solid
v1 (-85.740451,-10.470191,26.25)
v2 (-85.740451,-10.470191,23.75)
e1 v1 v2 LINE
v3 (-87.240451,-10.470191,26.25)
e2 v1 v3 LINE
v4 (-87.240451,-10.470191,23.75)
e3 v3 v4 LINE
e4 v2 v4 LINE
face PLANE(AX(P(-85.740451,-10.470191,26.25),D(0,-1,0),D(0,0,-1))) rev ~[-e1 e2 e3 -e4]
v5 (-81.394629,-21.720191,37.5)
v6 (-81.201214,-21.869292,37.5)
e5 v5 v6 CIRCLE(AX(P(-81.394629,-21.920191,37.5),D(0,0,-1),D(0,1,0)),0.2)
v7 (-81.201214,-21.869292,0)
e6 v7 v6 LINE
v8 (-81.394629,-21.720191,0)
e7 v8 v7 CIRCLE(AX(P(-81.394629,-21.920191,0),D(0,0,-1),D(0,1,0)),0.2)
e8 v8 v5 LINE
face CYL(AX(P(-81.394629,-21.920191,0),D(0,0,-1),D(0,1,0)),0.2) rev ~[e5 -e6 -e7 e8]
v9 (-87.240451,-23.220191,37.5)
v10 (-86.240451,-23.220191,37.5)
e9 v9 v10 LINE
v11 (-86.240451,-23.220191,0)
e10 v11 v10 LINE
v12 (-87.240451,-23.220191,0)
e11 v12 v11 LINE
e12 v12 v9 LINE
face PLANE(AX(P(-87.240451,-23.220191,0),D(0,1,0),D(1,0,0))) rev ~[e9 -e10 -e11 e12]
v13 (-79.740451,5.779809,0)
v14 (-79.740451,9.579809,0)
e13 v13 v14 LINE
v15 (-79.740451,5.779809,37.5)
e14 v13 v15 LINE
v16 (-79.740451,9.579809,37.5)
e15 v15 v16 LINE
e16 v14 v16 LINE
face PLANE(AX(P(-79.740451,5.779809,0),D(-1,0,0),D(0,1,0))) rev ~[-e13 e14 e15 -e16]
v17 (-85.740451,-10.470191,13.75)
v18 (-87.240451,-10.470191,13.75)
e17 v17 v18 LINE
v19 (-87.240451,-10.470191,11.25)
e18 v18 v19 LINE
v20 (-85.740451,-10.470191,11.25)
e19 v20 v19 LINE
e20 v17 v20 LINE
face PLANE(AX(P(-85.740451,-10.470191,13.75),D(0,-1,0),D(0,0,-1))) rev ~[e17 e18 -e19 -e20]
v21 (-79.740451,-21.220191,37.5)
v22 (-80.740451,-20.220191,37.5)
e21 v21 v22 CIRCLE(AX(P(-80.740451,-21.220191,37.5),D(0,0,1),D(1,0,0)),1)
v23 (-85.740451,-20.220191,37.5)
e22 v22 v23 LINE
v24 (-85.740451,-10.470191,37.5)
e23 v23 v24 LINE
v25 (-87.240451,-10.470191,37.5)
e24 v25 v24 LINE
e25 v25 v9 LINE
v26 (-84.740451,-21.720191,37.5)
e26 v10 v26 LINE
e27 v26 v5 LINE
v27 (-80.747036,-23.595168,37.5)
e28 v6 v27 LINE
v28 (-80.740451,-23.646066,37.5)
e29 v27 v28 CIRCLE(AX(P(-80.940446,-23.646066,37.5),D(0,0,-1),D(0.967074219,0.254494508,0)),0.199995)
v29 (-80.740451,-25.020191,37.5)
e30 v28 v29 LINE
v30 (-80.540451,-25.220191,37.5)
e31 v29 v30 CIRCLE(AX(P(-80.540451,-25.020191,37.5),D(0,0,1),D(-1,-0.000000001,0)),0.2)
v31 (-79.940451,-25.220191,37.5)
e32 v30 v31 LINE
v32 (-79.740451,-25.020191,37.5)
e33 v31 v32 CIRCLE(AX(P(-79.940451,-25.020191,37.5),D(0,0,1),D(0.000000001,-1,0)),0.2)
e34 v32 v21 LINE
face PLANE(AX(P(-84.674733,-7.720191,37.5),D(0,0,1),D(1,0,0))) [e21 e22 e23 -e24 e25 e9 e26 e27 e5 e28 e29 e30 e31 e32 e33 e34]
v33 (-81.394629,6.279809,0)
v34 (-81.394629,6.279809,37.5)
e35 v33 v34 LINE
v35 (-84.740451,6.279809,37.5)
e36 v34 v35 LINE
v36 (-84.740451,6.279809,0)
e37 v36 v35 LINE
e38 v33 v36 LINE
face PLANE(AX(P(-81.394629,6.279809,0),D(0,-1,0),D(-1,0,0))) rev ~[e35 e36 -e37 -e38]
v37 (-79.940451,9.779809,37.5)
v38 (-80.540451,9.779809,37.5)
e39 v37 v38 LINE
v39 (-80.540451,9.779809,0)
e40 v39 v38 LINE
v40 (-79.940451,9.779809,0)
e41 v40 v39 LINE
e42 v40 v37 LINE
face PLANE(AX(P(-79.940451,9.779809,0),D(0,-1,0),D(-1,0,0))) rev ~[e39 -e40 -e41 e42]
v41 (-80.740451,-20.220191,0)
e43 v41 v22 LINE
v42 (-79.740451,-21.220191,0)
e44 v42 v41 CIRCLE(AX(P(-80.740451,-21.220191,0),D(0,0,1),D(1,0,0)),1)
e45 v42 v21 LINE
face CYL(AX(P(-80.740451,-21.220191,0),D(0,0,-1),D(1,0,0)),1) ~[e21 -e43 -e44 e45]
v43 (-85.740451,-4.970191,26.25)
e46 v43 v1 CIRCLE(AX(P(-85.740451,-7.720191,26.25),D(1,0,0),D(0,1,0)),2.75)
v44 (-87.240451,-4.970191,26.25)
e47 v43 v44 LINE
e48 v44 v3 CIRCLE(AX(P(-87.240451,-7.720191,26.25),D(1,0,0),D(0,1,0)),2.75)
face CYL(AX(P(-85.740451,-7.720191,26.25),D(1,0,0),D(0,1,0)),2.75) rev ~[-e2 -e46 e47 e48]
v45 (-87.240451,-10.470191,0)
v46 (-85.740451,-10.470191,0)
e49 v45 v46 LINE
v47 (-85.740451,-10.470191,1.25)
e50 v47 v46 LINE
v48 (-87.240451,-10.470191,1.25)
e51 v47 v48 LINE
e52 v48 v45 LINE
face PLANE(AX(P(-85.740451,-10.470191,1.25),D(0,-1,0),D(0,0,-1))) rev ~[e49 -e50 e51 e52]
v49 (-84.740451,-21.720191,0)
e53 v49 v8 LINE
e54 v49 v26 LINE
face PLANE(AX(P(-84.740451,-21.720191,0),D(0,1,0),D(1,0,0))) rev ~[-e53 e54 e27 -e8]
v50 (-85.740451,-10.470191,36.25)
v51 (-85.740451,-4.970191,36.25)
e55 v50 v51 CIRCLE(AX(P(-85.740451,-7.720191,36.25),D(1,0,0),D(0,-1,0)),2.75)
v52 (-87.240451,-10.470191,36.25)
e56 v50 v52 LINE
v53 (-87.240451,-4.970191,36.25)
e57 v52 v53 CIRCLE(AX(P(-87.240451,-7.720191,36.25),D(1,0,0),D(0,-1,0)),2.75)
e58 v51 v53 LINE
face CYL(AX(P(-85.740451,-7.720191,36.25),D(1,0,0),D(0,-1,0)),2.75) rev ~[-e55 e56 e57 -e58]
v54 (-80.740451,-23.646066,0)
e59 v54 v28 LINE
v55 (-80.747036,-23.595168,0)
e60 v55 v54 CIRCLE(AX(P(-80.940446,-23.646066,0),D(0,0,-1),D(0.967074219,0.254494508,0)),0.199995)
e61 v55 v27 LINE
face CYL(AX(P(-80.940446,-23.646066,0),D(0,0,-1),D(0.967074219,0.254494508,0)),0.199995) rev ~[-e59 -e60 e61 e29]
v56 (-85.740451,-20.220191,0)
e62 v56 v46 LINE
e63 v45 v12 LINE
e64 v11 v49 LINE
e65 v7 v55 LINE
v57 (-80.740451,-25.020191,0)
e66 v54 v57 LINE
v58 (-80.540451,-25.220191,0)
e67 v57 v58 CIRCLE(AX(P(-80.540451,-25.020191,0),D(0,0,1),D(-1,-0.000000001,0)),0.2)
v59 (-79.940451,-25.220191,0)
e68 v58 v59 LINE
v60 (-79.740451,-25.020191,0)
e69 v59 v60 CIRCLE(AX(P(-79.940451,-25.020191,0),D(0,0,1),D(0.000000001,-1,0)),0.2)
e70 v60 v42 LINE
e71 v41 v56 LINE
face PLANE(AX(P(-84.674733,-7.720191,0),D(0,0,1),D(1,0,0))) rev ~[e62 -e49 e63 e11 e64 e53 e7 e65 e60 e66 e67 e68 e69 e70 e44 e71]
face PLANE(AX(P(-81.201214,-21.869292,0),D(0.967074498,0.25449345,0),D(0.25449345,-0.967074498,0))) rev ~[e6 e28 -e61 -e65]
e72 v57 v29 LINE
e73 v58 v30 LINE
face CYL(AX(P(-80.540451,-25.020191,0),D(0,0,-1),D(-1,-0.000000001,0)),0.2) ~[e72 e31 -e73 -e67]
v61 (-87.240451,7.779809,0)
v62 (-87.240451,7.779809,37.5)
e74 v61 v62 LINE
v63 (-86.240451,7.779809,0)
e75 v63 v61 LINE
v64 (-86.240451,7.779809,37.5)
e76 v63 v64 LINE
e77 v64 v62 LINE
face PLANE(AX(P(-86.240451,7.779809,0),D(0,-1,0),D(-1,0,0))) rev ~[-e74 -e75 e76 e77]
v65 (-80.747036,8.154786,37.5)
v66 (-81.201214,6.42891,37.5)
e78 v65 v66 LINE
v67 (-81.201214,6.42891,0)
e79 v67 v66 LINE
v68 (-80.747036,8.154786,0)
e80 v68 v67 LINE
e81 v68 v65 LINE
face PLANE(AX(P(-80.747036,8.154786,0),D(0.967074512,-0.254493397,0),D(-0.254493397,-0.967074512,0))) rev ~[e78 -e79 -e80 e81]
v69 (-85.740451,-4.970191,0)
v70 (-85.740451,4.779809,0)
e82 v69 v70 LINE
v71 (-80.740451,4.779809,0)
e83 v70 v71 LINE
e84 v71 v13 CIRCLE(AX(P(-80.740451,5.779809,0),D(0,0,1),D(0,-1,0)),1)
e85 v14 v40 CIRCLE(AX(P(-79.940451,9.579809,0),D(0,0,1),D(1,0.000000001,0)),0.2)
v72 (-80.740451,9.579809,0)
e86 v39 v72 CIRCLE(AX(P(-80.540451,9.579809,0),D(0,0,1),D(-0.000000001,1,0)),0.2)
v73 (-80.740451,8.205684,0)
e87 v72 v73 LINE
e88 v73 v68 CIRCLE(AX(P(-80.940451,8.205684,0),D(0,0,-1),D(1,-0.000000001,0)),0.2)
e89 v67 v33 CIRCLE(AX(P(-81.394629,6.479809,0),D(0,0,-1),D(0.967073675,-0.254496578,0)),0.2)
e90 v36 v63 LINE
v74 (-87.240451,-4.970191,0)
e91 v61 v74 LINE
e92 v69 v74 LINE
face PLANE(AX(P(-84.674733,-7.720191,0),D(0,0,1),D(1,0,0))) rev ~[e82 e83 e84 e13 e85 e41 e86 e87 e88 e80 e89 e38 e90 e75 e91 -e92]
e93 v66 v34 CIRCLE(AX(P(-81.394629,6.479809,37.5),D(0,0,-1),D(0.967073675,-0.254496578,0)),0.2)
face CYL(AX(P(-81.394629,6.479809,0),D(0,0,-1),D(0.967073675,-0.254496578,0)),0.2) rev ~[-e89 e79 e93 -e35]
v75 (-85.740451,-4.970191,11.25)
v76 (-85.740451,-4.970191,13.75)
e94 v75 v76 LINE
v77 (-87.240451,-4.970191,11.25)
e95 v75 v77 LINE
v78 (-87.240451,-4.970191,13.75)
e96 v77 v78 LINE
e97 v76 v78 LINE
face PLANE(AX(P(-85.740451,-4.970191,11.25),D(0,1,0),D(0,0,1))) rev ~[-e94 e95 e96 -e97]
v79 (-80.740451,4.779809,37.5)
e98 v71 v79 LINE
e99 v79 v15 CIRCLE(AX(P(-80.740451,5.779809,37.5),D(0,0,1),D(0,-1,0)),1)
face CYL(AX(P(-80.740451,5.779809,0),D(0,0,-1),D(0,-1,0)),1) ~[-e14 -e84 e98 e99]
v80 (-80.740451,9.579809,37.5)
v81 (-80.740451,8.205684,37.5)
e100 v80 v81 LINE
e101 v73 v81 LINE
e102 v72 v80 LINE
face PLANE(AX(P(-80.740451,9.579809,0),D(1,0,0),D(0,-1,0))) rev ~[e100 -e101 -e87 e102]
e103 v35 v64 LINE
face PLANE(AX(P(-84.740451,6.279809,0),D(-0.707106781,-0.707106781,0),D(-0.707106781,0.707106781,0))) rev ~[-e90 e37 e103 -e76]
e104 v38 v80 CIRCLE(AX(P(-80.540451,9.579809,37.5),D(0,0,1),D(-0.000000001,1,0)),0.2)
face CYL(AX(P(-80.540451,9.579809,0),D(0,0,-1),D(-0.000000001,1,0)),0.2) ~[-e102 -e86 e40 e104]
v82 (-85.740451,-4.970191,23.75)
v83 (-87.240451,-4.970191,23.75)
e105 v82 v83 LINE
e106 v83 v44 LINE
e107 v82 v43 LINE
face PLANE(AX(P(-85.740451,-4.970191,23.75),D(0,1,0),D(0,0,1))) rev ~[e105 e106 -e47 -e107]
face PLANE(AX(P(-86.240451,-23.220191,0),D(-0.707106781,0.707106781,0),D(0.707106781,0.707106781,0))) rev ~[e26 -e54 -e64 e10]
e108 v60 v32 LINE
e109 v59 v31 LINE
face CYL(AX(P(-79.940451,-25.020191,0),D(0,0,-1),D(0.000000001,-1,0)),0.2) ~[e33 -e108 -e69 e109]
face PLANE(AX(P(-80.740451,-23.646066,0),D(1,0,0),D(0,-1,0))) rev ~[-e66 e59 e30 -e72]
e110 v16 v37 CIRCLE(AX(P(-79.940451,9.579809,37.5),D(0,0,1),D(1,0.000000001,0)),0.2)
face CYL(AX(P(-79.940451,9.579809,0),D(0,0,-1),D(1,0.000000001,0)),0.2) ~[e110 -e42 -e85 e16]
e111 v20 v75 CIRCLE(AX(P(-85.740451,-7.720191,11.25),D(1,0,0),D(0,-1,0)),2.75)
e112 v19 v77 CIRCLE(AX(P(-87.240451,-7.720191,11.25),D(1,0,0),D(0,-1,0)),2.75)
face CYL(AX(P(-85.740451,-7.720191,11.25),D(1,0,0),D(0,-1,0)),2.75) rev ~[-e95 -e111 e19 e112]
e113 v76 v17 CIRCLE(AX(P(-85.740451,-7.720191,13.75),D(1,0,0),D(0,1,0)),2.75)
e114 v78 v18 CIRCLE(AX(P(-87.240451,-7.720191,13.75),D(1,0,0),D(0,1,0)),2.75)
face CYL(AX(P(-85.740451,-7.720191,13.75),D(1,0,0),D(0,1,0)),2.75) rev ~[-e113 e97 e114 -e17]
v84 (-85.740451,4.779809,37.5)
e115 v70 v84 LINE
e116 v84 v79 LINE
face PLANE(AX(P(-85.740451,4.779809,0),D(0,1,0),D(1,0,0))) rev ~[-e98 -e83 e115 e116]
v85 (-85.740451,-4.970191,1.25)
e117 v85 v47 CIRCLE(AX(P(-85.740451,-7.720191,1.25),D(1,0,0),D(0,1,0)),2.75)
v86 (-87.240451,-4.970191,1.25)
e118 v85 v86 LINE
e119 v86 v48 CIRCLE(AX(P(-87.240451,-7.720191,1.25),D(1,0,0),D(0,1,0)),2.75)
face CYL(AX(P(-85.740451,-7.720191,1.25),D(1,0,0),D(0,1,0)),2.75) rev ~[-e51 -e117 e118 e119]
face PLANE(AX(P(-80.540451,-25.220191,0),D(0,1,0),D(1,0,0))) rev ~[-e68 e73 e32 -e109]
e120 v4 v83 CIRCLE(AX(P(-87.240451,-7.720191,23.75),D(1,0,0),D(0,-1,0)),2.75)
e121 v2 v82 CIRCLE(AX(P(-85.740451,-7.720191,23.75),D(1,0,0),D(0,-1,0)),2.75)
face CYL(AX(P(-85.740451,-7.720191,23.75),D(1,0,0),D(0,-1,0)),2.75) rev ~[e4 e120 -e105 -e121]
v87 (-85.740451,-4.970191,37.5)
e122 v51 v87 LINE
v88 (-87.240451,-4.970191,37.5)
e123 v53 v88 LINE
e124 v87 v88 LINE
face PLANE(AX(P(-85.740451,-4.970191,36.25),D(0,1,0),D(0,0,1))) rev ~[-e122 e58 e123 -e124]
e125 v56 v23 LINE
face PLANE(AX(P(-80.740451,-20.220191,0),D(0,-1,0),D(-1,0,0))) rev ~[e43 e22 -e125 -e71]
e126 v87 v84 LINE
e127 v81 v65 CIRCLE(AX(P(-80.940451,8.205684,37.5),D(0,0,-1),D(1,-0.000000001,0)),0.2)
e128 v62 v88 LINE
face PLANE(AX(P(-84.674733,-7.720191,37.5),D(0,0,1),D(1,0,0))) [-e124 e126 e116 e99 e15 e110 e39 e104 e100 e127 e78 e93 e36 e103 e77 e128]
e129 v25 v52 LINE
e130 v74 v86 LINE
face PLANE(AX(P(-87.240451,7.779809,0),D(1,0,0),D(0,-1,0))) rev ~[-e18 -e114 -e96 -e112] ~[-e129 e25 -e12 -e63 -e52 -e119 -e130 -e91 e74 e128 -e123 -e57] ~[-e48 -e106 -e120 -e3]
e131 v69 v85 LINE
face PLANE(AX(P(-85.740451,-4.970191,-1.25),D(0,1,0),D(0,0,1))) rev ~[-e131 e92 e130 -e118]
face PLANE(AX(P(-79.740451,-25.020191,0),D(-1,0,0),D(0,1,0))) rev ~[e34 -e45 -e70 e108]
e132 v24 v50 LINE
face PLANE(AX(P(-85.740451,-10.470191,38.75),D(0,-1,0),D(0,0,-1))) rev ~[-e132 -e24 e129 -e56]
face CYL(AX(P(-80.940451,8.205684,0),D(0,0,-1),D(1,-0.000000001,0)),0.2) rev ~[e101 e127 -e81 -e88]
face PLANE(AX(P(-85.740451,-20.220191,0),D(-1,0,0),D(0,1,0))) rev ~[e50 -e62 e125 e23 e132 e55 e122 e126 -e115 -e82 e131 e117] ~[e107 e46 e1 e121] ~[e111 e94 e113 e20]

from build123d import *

# Parameters (mm, degrees)
F1_DEPTH = 37.5
F3_DEPTH = 25


# Not quite as in the source:
# - ends of sketch curves that miss each other by under 0.0002 mm in the source are joined


with BuildPart() as f1:
    # F0 (on Top) → F1 (new body)
    with BuildSketch(Plane.XY):
        with BuildLine():
            Line((-87.240451, 4.779809), (-87.240451, -5.411983))
            Line((-87.240451, -5.411983), (-87.240451, -7.720191))
            Line((-87.240451, -7.720191), (-87.240451, -17.023544))
            Line((-87.240451, -17.023544), (-87.240451, -20.220191))
            Line((-87.240451, -20.220191), (-87.240451, -23.220191))
            Line((-87.240451, -23.220191), (-86.240451, -23.220191))
            Line((-86.240451, -23.220191), (-84.740451, -21.720191))
            Line((-84.740451, -21.720191), (-81.394629, -21.720191))
            ThreePointArc((-81.394629, -21.720191), (-81.2725220613, -21.7617930975), (-81.2012141703, -21.8692920448))
            Line((-81.2012141703, -21.8692920448), (-80.747036, -23.595168))
            ThreePointArc((-80.747036, -23.595168), (-80.7421040626, -23.6204048929), (-80.740451, -23.646066))
            Line((-80.740451, -23.646066), (-80.740451, -25.020191))
            ThreePointArc((-80.740451, -25.020191), (-80.6818723562, -25.1616123562), (-80.540451, -25.220191))
            Line((-80.540451, -25.220191), (-79.940451, -25.220191))
            ThreePointArc((-79.940451, -25.220191), (-79.7990296438, -25.1616123562), (-79.740451, -25.020191))
            Line((-79.740451, -25.020191), (-79.740451, -21.220191))
            ThreePointArc((-79.740451, -21.220191), (-80.0333442188, -20.5130842188), (-80.740451, -20.220191))
            Line((-80.740451, -20.220191), (-85.740451, -20.220191))
            Line((-85.740451, -20.220191), (-85.740451, -7.720191))
            Line((-85.740451, -7.720191), (-85.740451, 4.779809))
            Line((-85.740451, 4.779809), (-80.740451, 4.779809))
            ThreePointArc((-80.740451, 4.779809), (-80.0333442188, 5.0727022188), (-79.740451, 5.779809))
            Line((-79.740451, 5.779809), (-79.740451, 9.579809))
            ThreePointArc((-79.740451, 9.579809), (-79.7990296438, 9.7212303562), (-79.940451, 9.779809))
            Line((-79.940451, 9.779809), (-80.540451, 9.779809))
            ThreePointArc((-80.540451, 9.779809), (-80.6818723562, 9.7212303562), (-80.740451, 9.579809))
            Line((-80.740451, 9.579809), (-80.740451, 8.205684))
            ThreePointArc((-80.740451, 8.205684), (-80.7421040626, 8.1800228929), (-80.7470359242, 8.15478598))
            Line((-80.7470359242, 8.15478598), (-81.201214, 6.42891))
            ThreePointArc((-81.201214, 6.42891), (-81.2725220613, 6.3214110975), (-81.394629, 6.279809))
            Line((-81.394629, 6.279809), (-84.740451, 6.279809))
            Line((-84.740451, 6.279809), (-86.240451, 7.779809))
            Line((-86.240451, 7.779809), (-87.240451, 7.779809))
            Line((-87.240451, 7.779809), (-87.240451, 4.779809))
        make_face()
    extrude(amount=F1_DEPTH)

    # F2 (on face) → F3 (cut)
    with BuildSketch(Plane.YZ.offset(-85.740451)):
        with BuildLine():
            ThreePointArc((-10.470191, 23.75), (-7.720191, 21), (-4.970191, 23.75))
            Line((-4.970191, 23.75), (-4.970191, 26.25))
            ThreePointArc((-4.970191, 26.25), (-7.720191, 29), (-10.470191, 26.25))
            Line((-10.470191, 26.25), (-10.470191, 23.75))
        make_face()
        with BuildLine():
            Line((-4.970191, 11.25), (-4.970191, 13.75))
            ThreePointArc((-4.970191, 13.75), (-7.720191, 16.5), (-10.470191, 13.75))
            Line((-10.470191, 13.75), (-10.470191, 11.25))
            ThreePointArc((-10.470191, 11.25), (-7.720191, 8.5), (-4.970191, 11.25))
        make_face()
        with BuildLine():
            Line((-4.970191, -1.25), (-4.970191, 1.25))
            ThreePointArc((-4.970191, 1.25), (-7.720191, 4), (-10.470191, 1.25))
            Line((-10.470191, 1.25), (-10.470191, -1.25))
            ThreePointArc((-10.470191, -1.25), (-7.720191, -4), (-4.970191, -1.25))
        make_face()
        with BuildLine():
            Line((-4.970191, 36.25), (-4.970191, 38.75))
            ThreePointArc((-4.970191, 38.75), (-7.720191, 41.5), (-10.470191, 38.75))
            Line((-10.470191, 38.75), (-10.470191, 36.25))
            ThreePointArc((-10.470191, 36.25), (-7.720191, 33.5), (-4.970191, 36.25))
        make_face()
    extrude(amount=-F3_DEPTH, mode=Mode.SUBTRACT)


solid = f1.part
